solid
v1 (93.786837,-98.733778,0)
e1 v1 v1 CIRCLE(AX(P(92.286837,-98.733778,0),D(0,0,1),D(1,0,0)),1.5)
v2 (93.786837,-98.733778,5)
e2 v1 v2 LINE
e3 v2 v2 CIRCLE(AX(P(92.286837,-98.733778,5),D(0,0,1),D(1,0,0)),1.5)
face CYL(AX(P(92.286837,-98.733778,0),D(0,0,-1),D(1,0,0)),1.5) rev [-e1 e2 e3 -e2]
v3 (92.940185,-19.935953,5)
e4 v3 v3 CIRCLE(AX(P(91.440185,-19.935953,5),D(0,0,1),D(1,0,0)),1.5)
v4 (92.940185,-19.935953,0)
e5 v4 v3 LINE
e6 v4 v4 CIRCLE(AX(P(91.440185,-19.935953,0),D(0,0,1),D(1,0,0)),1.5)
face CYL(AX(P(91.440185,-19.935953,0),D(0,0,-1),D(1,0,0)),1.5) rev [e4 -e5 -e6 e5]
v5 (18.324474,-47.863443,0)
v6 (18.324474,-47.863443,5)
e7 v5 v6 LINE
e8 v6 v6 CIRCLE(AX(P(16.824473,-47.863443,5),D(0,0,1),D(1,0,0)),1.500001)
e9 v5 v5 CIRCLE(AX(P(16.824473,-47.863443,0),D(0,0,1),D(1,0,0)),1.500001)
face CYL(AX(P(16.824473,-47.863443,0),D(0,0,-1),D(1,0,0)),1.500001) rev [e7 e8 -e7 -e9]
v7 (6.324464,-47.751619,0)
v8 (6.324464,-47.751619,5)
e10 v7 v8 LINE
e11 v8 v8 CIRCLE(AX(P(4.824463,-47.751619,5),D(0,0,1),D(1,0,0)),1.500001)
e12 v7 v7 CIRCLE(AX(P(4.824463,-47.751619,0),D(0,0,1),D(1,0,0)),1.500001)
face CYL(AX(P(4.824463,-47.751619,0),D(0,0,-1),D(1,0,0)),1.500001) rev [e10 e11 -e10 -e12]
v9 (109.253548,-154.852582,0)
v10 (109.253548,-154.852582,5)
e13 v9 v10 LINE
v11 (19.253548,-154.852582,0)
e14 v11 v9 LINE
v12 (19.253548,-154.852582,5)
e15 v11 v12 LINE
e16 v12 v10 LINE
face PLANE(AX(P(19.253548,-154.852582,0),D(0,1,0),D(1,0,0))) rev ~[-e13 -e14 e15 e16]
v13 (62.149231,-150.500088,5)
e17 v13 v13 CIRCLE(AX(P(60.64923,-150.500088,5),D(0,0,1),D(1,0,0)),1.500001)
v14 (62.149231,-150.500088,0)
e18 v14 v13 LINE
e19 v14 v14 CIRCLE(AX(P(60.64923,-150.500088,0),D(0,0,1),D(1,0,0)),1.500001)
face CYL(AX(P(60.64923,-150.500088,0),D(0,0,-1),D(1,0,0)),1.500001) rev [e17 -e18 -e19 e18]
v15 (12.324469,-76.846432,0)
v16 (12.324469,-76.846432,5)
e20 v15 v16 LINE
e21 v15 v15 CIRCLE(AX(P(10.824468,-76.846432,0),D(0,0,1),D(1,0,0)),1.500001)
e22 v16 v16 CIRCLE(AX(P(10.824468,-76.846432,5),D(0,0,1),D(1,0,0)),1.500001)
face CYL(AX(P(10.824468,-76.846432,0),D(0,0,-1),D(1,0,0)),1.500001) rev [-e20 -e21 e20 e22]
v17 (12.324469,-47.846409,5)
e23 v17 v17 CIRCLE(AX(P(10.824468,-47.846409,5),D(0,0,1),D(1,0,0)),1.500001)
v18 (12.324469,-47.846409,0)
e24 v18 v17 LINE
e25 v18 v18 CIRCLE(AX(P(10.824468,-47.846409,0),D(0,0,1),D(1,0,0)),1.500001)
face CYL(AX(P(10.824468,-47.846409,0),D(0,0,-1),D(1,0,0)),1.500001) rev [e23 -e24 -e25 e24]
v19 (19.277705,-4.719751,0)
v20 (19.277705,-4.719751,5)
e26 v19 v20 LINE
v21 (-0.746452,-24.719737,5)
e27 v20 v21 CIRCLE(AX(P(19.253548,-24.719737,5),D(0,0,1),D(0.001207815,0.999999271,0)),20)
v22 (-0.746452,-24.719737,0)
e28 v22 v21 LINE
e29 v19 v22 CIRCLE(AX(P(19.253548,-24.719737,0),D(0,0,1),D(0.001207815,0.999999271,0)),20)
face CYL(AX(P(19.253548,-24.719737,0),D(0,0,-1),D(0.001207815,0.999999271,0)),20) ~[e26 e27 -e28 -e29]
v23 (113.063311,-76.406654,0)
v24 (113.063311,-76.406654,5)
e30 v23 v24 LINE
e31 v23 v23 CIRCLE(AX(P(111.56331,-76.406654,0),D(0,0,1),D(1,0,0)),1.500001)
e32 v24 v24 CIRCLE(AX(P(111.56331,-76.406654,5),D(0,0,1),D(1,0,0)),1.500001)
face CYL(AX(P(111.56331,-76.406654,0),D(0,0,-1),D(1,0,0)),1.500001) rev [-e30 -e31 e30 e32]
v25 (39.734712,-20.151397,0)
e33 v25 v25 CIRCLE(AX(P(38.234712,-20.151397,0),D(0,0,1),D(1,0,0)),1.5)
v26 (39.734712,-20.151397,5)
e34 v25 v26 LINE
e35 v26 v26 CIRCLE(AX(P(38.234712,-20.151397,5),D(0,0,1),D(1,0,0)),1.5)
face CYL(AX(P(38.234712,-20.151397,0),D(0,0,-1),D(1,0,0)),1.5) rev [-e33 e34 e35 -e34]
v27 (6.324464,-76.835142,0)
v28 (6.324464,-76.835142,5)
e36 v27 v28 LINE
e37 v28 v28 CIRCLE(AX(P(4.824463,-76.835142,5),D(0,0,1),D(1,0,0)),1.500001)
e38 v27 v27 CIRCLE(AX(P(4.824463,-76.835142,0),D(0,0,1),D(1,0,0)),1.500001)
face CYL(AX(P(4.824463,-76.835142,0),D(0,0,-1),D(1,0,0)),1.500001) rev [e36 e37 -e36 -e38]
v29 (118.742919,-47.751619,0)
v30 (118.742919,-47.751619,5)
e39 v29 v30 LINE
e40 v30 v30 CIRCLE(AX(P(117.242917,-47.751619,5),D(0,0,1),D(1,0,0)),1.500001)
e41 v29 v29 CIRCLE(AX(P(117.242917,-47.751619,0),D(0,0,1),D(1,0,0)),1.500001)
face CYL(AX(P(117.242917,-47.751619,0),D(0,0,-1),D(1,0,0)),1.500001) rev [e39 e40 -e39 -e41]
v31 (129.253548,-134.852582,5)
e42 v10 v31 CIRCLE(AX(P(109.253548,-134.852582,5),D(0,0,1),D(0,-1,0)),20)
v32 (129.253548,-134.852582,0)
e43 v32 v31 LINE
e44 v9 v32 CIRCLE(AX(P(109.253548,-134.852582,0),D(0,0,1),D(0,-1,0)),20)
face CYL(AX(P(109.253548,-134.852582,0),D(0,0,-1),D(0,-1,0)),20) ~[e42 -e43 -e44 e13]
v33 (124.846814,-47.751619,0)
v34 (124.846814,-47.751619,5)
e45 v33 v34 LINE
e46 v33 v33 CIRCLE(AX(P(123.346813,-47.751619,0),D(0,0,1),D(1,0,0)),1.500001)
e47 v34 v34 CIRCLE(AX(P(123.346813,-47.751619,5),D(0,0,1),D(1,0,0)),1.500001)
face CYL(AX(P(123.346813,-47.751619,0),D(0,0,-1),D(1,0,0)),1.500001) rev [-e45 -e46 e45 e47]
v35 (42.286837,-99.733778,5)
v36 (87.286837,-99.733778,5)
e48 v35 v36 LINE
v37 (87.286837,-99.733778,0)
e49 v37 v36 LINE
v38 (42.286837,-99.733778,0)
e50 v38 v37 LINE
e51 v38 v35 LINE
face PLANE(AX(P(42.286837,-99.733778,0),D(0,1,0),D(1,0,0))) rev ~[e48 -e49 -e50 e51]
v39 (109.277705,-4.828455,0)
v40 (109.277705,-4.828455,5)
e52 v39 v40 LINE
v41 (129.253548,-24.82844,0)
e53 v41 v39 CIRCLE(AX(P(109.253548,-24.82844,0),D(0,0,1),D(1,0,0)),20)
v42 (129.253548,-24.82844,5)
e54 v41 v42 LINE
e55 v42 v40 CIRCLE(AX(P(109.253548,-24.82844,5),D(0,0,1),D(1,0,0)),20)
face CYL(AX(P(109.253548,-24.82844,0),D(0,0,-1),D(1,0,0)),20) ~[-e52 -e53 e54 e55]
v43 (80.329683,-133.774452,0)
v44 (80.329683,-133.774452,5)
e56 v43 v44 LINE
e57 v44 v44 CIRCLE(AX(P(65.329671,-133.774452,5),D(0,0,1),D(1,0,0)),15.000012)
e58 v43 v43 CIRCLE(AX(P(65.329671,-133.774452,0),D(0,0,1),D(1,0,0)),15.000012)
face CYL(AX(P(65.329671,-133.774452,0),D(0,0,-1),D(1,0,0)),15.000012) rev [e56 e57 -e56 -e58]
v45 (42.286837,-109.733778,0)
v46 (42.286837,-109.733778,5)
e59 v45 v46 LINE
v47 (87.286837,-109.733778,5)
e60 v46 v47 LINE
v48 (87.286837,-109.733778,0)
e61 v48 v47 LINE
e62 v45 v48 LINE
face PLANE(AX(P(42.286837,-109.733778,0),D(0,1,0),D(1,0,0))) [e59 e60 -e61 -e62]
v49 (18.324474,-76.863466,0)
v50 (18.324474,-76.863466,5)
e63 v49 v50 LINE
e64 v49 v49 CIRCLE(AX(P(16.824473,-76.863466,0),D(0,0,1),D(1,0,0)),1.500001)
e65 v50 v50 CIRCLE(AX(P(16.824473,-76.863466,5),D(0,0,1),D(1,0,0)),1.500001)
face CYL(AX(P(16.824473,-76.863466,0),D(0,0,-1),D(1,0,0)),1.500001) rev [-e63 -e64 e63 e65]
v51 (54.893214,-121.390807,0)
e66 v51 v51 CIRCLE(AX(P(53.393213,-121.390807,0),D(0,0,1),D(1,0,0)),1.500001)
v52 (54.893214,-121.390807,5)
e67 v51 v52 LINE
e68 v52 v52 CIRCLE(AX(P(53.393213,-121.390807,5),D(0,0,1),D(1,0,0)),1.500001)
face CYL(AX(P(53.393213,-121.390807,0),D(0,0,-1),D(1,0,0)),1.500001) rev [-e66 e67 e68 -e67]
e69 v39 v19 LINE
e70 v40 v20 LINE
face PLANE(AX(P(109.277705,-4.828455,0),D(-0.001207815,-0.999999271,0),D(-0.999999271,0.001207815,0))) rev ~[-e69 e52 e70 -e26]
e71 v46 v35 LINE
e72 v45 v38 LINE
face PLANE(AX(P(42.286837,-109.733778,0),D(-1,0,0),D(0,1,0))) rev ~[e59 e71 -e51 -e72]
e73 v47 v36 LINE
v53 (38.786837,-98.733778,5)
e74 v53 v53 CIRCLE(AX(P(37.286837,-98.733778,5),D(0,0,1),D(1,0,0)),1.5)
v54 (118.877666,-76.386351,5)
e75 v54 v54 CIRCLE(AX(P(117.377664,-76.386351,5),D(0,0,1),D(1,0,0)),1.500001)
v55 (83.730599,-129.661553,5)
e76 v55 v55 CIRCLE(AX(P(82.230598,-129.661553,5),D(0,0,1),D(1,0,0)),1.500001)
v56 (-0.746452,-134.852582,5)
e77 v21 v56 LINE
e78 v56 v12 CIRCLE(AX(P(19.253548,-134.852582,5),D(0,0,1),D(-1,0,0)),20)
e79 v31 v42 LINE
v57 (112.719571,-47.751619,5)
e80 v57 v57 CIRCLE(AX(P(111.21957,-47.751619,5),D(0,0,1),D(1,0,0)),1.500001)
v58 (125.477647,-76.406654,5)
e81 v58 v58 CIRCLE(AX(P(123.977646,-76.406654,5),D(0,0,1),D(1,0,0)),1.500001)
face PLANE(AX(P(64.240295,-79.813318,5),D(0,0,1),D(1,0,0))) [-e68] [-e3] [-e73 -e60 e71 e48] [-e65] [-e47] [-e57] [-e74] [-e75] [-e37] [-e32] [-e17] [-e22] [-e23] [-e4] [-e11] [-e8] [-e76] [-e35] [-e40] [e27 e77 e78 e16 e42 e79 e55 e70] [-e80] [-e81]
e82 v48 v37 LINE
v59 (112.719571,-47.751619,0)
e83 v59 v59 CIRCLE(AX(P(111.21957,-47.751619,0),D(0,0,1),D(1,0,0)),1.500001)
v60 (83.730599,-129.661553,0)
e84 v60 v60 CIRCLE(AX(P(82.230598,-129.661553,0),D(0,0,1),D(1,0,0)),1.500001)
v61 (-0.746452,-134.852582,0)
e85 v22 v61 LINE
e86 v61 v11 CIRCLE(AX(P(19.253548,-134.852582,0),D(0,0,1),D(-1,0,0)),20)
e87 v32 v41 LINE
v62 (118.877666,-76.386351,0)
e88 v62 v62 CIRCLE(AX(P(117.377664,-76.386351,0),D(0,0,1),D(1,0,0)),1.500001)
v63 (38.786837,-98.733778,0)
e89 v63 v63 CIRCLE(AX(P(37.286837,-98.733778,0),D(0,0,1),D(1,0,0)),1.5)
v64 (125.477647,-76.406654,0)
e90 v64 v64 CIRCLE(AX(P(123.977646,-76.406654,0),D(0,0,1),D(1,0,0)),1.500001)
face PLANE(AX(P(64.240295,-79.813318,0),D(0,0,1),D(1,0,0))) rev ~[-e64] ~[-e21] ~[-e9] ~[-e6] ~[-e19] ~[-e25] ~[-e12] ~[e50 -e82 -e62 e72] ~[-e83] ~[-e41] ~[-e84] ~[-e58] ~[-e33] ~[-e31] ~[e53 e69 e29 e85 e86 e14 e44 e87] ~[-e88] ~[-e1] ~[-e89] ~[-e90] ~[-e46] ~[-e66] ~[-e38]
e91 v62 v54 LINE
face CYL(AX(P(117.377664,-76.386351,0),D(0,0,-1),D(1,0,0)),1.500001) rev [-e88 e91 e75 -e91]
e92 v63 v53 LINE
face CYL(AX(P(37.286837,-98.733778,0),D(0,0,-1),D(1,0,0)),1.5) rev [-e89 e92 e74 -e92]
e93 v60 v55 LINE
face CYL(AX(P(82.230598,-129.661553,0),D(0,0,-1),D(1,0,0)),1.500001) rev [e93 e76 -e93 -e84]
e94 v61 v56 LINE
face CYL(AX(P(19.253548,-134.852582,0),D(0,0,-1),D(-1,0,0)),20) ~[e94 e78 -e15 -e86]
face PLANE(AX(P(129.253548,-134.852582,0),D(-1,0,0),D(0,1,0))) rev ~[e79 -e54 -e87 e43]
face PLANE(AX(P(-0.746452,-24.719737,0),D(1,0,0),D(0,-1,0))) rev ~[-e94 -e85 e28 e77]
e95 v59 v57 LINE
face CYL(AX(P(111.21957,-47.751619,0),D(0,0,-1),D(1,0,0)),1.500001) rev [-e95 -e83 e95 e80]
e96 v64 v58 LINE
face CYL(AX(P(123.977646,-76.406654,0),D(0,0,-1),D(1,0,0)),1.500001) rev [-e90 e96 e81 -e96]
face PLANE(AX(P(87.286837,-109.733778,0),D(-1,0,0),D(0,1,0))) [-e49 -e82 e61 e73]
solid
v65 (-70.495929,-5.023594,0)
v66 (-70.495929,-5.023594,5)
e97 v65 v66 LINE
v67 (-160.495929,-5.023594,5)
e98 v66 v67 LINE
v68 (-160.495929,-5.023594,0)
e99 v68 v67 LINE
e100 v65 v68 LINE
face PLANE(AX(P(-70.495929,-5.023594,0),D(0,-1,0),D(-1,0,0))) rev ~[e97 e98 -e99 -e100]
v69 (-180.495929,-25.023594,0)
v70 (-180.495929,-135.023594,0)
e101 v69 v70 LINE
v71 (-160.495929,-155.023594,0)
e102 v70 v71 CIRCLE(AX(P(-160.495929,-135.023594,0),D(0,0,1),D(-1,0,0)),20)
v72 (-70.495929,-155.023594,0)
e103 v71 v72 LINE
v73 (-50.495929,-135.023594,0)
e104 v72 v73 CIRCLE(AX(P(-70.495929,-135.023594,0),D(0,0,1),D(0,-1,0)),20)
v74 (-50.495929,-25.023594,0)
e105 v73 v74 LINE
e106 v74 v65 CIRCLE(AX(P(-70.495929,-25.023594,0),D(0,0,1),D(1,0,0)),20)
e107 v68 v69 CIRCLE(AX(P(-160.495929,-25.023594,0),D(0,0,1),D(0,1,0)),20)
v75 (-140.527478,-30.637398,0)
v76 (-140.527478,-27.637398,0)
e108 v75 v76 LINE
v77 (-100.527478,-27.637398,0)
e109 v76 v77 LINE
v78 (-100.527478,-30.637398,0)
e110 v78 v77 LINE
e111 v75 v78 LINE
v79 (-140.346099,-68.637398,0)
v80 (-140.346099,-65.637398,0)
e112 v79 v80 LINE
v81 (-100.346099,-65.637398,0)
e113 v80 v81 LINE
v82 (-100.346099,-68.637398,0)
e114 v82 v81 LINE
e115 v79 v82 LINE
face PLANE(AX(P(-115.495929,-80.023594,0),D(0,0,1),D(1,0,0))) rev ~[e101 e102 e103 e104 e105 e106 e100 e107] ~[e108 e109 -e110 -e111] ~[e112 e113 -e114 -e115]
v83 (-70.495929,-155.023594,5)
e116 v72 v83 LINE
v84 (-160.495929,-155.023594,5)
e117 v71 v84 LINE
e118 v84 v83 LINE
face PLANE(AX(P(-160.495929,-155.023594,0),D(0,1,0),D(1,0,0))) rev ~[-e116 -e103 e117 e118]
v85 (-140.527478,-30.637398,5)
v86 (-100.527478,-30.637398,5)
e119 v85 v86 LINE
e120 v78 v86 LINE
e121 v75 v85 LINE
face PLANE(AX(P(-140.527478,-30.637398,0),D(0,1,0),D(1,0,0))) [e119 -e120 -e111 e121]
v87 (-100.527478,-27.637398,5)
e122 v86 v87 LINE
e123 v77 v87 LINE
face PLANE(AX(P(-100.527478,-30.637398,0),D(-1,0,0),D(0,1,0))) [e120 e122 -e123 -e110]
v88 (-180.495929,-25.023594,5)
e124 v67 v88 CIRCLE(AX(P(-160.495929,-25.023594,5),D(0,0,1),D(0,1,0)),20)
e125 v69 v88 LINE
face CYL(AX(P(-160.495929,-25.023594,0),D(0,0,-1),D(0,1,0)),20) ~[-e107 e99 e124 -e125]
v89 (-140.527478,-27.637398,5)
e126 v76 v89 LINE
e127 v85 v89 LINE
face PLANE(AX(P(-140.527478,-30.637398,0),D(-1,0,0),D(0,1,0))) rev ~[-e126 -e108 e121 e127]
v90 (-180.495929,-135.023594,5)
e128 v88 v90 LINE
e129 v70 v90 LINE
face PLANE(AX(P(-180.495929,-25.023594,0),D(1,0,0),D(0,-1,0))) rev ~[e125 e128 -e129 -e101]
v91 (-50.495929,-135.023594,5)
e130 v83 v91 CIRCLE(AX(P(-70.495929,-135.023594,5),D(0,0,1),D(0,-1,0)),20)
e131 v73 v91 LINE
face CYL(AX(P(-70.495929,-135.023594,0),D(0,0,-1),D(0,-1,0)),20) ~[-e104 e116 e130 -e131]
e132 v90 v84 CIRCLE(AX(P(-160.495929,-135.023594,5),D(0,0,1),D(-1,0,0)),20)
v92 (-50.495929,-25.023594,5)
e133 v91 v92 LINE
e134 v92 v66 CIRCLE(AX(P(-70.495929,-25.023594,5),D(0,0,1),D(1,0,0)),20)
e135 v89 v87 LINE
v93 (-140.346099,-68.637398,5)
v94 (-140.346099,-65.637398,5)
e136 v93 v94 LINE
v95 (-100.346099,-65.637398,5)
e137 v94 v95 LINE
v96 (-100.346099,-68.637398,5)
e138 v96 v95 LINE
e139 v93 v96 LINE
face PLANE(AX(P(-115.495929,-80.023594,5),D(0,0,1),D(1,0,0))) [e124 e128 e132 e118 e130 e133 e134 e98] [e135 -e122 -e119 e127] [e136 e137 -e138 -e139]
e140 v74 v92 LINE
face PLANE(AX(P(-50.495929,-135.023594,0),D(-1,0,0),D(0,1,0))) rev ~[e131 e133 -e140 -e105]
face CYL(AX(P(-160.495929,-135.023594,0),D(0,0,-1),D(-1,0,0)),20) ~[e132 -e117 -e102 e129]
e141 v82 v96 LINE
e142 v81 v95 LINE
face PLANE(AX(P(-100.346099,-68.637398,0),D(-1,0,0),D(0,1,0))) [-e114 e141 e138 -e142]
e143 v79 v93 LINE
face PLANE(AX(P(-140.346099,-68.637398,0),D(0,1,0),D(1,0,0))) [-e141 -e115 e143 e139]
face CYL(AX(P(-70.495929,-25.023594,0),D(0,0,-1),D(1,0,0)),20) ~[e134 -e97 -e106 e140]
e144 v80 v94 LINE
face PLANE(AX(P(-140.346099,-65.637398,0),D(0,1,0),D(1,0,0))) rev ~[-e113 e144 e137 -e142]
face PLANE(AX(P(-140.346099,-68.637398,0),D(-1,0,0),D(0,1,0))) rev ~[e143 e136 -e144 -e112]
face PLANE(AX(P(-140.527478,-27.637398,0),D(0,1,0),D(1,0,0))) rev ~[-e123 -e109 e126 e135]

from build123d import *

# Parameters (mm, degrees)
F0_R     = 1.5000012089
F0_R_2   = 15.0000120892
F0_W     = 63
F0_H     = 28
F0_R_3   = 1.5
F0_W_2   = 45
F0_H_2   = 10
F1_DEPTH = 5
F0_W_3   = 40
F0_H_3   = 3
F2_DEPTH = 5


# Not quite as in the source:
# - a feature names something its author has since deleted; it is built from what else it names


with BuildPart() as f1:
    # F0 (on Top) → F1 (new body)
    with BuildSketch(Plane.XY):
        with BuildLine():
            Line((109.2777046029, -4.8284545538), (19.2777046029, -4.7197510892))
            ThreePointArc((19.2777046029, -4.7197510892), (5.1199557962, -10.5690629101), (-0.746451705, -24.719736501))
            Line((-0.746451705, -24.719736501), (-0.746451705, -134.8525817028))
            ThreePointArc((-0.746451705, -134.8525817028), (5.1114126713, -148.9947173266), (19.253548295, -154.8525817028))
            Line((19.253548295, -154.8525817028), (109.253548295, -154.8525817028))
            ThreePointArc((109.253548295, -154.8525817028), (123.3956839188, -148.9947173266), (129.253548295, -134.8525817028))
            Line((129.253548295, -134.8525817028), (129.253548295, -24.8284399656))
            ThreePointArc((129.253548295, -24.8284399656), (123.404221886, -10.6948474668), (109.2777046029, -4.8284545538))
        make_face()
        with Locations((60.6492295242, -150.5000877334)):
            Circle(F0_R, mode=Mode.SUBTRACT)
        with Locations((65.3296712528, -133.7744518814)):
            Circle(F0_R_2, mode=Mode.SUBTRACT)
        with Locations((82.2305977345, -129.661552608)):
            Circle(F0_R, mode=Mode.SUBTRACT)
        with Locations((53.3932128331, -121.3908070522)):
            Circle(F0_R, mode=Mode.SUBTRACT)
        with Locations((64.7868365049, -98.7337777073)):
            Rectangle(F0_W, F0_H, mode=Mode.SUBTRACT)
        with Locations((4.8244629152, -76.8351420979)):
            Circle(F0_R, mode=Mode.SUBTRACT)
        with Locations((10.8244677509, -76.8464319149)):
            Circle(F0_R, mode=Mode.SUBTRACT)
        with Locations((16.8244725865, -76.8634664953)):
            Circle(F0_R, mode=Mode.SUBTRACT)
        with Locations((4.8244629152, -47.7516189505)):
            Circle(F0_R, mode=Mode.SUBTRACT)
        with Locations((10.8244677509, -47.8464085426)):
            Circle(F0_R, mode=Mode.SUBTRACT)
        with Locations((16.8244725865, -47.8634431229)):
            Circle(F0_R, mode=Mode.SUBTRACT)
        with Locations((111.5633096981, -76.4066539684)):
            Circle(F0_R, mode=Mode.SUBTRACT)
        with Locations((117.3776644514, -76.3863511993)):
            Circle(F0_R, mode=Mode.SUBTRACT)
        with Locations((123.9776462317, -76.4066539684)):
            Circle(F0_R, mode=Mode.SUBTRACT)
        with Locations((111.2195700407, -47.7516189505)):
            Circle(F0_R, mode=Mode.SUBTRACT)
        with Locations((117.2429174185, -47.7516189505)):
            Circle(F0_R, mode=Mode.SUBTRACT)
        with Locations((123.3468130231, -47.7516189505)):
            Circle(F0_R, mode=Mode.SUBTRACT)
        with Locations((38.2347119981, -20.1513972986)):
            Circle(F0_R_3, mode=Mode.SUBTRACT)
        with Locations((91.4401854171, -19.9359528023)):
            Circle(F0_R_3, mode=Mode.SUBTRACT)
        with Locations((64.7868365049, -98.7337777073)):
            Rectangle(F0_W, F0_H)
        with Locations((37.2868365049, -98.7337777073)):
            Circle(F0_R_3, mode=Mode.SUBTRACT)
        with Locations((64.7868365049, -104.7337777073)):
            Rectangle(F0_W_2, F0_H_2, mode=Mode.SUBTRACT)
        with Locations((92.2868365049, -98.7337777073)):
            Circle(F0_R_3, mode=Mode.SUBTRACT)
    extrude(amount=F1_DEPTH)


with BuildPart() as f2:
    # F0 (on Top) → F2 (new body)
    with BuildSketch(Plane.XY):
        with BuildLine():
            Line((-70.49592942, -5.0235935599), (-160.49592942, -5.0235935599))
            ThreePointArc((-160.49592942, -5.0235935599), (-174.6380650437, -10.8814579361), (-180.49592942, -25.0235935599))
            Line((-180.49592942, -25.0235935599), (-180.49592942, -135.0235935599))
            ThreePointArc((-180.49592942, -135.0235935599), (-174.6380650437, -149.1657291836), (-160.49592942, -155.0235935599))
            Line((-160.49592942, -155.0235935599), (-70.49592942, -155.0235935599))
            ThreePointArc((-70.49592942, -155.0235935599), (-56.3537937963, -149.1657291836), (-50.49592942, -135.0235935599))
            Line((-50.49592942, -135.0235935599), (-50.49592942, -25.0235935599))
            ThreePointArc((-50.49592942, -25.0235935599), (-56.3537937963, -10.8814579361), (-70.49592942, -5.0235935599))
        make_face()
        with Locations((-120.3460991383, -67.1373978257)):
            Rectangle(F0_W_3, F0_H_3, mode=Mode.SUBTRACT)
        with Locations((-120.5274779797, -29.1373978257)):
            Rectangle(F0_W_3, F0_H_3, mode=Mode.SUBTRACT)
    extrude(amount=F2_DEPTH)


solid = Compound([f1.part, f2.part])
